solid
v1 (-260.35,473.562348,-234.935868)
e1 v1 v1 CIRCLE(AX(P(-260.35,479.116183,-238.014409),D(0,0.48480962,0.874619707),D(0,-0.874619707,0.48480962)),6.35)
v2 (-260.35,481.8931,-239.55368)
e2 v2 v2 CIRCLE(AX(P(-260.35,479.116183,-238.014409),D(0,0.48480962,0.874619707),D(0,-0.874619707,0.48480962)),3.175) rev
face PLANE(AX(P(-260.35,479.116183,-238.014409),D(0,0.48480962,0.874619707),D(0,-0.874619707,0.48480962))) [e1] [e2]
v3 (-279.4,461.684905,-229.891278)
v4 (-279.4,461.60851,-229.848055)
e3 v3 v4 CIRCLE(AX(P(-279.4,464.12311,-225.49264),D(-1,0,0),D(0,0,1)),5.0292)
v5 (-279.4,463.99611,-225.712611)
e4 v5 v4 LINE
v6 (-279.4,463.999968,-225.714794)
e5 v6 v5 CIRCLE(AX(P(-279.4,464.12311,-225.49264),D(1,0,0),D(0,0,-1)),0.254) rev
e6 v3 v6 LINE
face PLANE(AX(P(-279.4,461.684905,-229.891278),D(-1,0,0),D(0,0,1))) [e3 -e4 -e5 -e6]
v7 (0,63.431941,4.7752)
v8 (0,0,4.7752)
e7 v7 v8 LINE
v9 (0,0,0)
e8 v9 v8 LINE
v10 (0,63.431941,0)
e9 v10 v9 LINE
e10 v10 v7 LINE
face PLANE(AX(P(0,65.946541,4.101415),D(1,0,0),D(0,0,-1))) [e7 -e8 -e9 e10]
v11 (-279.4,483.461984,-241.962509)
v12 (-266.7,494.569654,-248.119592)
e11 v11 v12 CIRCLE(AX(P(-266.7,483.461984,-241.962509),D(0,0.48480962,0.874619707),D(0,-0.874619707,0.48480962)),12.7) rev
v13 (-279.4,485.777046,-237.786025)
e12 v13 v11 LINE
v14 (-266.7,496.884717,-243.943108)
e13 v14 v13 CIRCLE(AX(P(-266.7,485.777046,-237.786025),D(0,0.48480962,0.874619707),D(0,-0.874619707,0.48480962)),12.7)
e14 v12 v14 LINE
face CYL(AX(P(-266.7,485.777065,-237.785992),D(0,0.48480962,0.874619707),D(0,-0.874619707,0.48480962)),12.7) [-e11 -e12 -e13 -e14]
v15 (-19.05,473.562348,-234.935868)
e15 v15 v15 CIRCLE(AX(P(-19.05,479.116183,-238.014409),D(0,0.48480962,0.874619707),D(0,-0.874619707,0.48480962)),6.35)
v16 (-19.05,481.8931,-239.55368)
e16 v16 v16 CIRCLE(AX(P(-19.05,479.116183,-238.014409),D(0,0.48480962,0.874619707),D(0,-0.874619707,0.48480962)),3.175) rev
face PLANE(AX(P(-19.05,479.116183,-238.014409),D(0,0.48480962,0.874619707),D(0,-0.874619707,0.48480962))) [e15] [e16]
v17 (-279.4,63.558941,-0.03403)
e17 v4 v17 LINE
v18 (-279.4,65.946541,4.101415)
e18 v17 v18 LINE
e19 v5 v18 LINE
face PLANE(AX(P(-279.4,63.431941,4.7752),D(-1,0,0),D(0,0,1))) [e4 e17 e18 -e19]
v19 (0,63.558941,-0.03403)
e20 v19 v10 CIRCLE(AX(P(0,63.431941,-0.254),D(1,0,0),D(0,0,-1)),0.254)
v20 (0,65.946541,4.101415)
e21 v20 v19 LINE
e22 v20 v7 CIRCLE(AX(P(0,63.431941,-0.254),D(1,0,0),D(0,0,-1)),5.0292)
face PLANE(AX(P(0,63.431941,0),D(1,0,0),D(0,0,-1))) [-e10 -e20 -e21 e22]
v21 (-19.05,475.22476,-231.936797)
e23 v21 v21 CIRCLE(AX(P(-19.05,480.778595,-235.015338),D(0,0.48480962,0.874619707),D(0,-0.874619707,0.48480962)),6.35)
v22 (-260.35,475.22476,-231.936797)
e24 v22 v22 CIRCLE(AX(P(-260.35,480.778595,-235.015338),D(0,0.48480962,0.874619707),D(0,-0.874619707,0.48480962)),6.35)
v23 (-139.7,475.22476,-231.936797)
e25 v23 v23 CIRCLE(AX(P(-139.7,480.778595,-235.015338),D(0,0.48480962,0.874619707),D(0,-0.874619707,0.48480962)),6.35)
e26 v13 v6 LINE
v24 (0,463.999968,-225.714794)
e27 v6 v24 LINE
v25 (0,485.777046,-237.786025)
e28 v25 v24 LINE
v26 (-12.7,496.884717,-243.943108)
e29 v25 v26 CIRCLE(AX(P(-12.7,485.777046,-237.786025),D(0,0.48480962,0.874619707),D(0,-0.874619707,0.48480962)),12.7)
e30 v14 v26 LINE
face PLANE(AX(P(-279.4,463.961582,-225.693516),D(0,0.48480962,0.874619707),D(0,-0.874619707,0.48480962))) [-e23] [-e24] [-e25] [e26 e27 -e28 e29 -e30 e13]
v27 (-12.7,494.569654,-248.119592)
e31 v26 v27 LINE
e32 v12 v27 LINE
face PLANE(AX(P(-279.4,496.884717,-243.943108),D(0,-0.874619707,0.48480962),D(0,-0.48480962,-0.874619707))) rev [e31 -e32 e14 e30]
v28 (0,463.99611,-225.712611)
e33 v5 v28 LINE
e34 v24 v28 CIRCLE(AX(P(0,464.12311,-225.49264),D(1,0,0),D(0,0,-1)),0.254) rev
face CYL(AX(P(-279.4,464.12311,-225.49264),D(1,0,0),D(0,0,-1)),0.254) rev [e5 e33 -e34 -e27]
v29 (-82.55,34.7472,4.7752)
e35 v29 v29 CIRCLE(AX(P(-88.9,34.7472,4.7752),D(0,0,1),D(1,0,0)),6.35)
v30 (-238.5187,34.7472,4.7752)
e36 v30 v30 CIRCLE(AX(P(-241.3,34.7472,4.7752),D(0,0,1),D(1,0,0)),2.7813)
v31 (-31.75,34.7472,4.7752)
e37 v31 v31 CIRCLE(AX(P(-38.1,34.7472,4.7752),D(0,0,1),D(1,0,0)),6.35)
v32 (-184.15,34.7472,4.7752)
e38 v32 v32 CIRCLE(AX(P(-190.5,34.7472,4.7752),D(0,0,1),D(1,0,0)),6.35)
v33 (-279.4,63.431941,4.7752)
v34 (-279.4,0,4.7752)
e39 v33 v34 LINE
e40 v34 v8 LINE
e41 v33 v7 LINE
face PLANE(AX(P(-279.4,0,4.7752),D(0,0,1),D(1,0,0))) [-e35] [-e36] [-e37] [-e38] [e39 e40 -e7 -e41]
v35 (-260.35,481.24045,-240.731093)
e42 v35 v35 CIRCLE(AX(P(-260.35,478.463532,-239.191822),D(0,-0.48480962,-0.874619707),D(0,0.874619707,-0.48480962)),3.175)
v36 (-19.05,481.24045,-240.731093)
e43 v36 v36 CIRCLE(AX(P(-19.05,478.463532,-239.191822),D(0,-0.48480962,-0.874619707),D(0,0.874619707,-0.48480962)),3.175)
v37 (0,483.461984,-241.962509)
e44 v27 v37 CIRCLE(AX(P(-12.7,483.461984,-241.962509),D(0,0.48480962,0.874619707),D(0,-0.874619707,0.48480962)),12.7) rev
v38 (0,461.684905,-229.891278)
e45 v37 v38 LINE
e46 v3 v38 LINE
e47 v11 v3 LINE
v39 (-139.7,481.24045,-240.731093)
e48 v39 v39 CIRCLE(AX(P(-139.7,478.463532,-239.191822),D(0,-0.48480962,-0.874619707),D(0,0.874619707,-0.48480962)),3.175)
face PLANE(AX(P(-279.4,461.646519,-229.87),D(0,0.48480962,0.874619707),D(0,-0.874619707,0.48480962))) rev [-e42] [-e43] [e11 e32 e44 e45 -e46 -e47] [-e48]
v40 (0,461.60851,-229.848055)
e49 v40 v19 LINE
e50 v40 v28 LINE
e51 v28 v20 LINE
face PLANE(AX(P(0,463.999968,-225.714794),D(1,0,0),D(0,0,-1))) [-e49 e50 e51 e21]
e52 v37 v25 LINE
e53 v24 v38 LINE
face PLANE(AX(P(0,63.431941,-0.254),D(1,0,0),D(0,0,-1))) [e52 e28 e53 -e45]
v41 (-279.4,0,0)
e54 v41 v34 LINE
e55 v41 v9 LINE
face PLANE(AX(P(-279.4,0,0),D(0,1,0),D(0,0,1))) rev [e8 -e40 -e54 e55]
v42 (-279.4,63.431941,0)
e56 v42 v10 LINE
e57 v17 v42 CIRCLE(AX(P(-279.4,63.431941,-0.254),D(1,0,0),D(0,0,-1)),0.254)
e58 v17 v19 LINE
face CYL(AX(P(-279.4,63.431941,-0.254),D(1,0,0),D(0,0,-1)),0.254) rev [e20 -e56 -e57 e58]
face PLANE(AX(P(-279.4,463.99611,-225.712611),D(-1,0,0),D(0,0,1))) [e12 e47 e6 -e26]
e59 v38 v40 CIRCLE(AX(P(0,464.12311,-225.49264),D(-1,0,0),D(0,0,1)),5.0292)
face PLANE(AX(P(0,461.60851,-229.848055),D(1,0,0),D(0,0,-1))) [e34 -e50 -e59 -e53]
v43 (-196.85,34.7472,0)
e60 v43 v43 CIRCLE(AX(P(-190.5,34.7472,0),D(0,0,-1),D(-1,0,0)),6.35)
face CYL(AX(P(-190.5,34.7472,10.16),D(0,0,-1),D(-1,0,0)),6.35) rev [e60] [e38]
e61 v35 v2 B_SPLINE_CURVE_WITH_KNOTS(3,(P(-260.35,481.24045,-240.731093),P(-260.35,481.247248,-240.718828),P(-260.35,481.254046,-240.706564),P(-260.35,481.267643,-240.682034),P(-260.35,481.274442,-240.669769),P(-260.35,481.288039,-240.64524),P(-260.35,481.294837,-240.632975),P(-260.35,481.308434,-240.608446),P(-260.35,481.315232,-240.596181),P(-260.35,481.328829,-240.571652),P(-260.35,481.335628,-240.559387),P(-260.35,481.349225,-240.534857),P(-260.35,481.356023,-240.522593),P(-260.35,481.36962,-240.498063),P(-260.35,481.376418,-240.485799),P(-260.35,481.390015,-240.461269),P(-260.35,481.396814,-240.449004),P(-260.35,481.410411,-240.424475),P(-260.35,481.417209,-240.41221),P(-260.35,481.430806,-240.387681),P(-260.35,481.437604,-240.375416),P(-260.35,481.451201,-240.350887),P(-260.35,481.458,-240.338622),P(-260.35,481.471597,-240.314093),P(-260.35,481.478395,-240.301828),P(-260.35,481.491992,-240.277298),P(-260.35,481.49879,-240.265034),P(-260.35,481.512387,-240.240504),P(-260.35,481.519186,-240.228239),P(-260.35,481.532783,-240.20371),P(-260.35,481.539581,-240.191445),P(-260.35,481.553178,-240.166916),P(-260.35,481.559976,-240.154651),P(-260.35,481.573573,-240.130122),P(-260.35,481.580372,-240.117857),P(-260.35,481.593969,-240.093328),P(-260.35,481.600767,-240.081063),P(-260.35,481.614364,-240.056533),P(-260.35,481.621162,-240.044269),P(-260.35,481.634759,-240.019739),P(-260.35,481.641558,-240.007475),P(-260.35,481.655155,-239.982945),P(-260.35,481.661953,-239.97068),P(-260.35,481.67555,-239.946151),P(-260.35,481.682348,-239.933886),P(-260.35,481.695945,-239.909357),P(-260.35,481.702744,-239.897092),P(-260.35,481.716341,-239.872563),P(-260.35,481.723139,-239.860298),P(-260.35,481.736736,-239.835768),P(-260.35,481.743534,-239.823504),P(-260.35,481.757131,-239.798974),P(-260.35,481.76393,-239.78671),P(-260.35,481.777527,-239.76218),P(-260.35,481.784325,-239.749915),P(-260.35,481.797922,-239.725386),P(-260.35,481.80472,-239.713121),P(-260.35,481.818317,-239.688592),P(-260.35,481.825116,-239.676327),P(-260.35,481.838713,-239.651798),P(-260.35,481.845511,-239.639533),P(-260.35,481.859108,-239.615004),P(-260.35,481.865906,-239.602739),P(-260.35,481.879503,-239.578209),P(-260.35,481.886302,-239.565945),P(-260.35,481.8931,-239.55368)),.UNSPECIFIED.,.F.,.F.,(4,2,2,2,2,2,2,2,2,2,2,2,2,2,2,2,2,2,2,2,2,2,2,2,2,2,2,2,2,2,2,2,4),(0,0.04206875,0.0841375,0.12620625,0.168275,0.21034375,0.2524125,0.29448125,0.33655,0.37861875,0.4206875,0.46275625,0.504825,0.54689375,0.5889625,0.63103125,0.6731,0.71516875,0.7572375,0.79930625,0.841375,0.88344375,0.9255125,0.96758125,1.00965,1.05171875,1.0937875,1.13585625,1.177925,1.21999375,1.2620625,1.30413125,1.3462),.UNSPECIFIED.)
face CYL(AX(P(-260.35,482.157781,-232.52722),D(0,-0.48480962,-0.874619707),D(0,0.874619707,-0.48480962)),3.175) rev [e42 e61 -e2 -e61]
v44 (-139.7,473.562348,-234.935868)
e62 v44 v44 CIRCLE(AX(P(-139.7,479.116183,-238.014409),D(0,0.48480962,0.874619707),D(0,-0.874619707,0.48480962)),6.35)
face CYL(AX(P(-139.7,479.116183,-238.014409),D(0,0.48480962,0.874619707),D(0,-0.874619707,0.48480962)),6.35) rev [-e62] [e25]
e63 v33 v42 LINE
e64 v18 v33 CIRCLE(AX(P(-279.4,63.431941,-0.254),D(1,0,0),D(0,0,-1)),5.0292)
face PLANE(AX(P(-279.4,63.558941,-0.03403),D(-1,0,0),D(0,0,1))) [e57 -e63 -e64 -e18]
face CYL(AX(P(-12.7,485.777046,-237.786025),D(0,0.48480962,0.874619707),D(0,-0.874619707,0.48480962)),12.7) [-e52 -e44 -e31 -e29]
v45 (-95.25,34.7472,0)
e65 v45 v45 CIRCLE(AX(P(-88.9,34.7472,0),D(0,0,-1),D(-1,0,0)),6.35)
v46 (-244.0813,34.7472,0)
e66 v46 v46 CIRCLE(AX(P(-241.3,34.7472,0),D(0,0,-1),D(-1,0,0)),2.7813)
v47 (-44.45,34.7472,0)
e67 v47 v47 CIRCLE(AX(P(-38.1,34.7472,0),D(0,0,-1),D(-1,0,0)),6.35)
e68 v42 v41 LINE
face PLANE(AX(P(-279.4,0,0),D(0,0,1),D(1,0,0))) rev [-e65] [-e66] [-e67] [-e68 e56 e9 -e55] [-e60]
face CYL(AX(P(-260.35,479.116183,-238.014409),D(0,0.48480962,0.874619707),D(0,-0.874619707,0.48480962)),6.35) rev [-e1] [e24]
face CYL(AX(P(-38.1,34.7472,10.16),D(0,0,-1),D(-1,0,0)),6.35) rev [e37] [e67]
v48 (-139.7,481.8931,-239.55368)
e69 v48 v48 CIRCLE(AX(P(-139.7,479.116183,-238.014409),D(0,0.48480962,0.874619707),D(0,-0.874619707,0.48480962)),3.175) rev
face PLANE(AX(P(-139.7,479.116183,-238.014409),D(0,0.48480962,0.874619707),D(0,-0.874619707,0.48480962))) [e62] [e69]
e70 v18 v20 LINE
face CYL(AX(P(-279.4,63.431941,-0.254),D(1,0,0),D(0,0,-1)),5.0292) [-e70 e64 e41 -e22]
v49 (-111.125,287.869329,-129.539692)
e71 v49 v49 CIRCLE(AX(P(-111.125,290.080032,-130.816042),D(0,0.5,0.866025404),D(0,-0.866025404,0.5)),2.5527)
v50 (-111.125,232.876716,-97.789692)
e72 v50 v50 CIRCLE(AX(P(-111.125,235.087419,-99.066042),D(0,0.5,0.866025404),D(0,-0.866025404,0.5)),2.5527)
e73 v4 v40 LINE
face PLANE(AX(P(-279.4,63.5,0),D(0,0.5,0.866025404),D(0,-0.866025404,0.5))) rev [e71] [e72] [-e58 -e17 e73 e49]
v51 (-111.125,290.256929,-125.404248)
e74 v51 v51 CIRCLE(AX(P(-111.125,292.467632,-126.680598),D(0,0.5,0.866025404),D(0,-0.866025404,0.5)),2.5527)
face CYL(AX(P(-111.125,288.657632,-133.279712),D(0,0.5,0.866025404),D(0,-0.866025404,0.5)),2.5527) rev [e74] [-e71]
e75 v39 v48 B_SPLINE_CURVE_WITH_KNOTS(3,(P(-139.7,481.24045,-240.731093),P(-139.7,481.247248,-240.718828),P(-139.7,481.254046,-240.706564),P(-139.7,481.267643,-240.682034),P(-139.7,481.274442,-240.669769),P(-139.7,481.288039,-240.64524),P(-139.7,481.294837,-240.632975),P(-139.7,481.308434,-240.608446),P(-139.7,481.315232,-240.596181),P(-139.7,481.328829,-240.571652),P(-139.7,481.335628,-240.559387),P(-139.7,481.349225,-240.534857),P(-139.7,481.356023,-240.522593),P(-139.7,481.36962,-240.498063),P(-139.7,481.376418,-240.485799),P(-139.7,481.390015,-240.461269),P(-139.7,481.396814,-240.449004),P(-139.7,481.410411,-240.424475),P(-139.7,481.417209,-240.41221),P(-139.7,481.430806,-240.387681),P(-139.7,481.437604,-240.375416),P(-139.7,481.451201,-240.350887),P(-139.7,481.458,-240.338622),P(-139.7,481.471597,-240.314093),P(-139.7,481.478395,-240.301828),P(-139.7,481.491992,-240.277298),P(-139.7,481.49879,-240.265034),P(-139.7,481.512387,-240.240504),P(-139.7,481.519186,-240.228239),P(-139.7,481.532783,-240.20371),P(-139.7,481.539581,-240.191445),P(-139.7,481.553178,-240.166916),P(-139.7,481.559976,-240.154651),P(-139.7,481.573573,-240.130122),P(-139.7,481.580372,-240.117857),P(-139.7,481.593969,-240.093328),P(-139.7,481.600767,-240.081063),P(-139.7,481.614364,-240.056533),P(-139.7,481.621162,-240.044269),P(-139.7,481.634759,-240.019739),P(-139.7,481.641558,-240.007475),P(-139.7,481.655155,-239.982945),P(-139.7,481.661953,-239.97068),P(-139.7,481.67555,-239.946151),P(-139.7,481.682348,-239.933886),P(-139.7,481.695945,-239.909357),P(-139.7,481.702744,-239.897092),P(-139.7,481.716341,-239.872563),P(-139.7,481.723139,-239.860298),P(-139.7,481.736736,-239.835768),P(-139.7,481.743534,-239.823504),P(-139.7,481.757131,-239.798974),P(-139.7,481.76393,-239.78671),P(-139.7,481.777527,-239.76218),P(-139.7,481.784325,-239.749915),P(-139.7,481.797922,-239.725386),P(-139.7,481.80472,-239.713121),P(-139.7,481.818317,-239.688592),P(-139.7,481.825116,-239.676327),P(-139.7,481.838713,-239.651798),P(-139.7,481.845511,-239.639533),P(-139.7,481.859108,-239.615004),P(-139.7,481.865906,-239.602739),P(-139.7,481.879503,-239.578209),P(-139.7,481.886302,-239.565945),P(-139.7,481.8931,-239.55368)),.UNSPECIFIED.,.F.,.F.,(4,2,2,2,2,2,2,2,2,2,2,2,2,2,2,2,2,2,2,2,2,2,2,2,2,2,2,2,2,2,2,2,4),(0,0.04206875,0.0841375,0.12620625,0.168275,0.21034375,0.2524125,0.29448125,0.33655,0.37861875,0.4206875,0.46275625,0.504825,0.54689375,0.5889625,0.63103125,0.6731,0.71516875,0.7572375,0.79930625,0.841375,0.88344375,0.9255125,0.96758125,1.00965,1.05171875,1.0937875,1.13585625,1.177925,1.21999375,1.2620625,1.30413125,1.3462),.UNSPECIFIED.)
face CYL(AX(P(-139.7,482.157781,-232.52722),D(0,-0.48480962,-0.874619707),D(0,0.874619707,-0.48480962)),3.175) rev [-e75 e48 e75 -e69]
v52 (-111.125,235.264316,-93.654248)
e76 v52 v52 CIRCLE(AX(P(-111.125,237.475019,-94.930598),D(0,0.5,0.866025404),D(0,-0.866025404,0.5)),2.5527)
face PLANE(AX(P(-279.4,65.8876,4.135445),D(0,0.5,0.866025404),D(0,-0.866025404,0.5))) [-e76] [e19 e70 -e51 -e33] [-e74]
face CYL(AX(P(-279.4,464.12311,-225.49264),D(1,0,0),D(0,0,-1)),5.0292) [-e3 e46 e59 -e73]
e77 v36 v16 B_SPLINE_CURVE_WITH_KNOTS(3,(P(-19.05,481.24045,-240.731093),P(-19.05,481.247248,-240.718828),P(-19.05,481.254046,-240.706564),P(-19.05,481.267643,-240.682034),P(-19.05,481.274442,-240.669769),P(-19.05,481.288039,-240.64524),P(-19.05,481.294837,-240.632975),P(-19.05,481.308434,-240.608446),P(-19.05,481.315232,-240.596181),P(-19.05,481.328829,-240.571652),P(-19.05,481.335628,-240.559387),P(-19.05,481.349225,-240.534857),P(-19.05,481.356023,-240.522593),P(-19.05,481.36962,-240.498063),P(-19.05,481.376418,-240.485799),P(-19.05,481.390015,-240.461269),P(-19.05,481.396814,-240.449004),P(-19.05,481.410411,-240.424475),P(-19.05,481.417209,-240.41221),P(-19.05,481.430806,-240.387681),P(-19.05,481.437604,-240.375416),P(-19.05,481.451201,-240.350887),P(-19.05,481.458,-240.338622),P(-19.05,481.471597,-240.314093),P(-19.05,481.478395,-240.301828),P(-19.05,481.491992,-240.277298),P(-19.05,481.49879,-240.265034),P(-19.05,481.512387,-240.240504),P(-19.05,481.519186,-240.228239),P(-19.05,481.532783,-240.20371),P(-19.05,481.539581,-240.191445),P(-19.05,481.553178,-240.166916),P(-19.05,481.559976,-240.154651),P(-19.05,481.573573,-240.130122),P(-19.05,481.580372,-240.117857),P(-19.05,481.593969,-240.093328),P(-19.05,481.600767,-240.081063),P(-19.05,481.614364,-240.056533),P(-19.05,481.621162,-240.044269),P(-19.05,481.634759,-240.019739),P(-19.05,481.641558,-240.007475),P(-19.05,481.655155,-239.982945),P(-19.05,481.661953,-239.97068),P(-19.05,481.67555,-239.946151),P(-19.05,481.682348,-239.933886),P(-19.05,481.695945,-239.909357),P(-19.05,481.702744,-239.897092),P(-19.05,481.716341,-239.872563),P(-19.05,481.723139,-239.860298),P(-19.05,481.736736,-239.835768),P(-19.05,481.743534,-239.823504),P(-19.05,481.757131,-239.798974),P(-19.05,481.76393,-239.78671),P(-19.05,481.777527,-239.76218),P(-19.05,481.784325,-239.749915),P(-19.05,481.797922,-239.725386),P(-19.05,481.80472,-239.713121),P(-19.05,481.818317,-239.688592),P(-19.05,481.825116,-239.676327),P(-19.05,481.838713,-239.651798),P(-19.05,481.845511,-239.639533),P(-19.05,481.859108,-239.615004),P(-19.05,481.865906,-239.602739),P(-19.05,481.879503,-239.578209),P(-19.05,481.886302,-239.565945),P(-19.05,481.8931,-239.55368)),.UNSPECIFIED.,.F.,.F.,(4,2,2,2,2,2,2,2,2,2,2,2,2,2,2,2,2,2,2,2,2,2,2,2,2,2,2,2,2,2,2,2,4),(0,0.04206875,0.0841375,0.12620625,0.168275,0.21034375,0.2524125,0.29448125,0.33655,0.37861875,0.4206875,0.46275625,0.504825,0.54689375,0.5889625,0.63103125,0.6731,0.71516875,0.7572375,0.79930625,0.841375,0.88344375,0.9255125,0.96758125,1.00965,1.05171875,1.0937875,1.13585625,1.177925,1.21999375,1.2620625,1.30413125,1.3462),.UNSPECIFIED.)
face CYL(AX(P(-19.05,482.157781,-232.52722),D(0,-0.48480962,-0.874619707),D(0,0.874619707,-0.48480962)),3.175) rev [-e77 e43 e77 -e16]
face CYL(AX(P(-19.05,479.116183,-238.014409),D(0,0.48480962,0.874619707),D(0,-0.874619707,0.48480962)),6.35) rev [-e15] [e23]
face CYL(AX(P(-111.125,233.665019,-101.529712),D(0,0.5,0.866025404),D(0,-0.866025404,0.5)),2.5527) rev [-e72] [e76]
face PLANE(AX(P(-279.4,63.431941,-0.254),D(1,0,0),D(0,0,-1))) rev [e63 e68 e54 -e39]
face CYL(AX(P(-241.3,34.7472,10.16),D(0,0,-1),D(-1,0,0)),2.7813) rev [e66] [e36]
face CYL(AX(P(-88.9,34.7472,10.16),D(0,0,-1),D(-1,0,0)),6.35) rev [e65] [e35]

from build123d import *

# Parameters (mm, degrees)
BASE_FLANGE1_DEPTH = 279.4
SKETCH4_R          = 3.175
TAB1_DEPTH         = 4.7752
SKETCH4_2_R        = 3.175
CUT_EXTRUDE1_DEPTH = 7.62
SKETCH5_R          = 6.35
SKETCH5_R_2        = 2.7813
CUT_EXTRUDE2_DEPTH = 10.16
SKETCH6_R          = 6.35
CUT_EXTRUDE3_DEPTH = 3.429
FILLET1_R          = 12.7
FILLET2_R          = 12.7
SKETCH7_R          = 2.5527
CUT_EXTRUDE4_DEPTH = 7.62


# Sheet-metal steps are written as plain solids
with BuildPart() as part:
    # Sketch1 → Base-Flange1 (new body)
    with BuildSketch(Plane(origin=(0, 0, 0), x_dir=(0, 0, -1), z_dir=(1, 0, 0))):
        with BuildLine():
            Line((0, 0), (0, 63.431940905))
            ThreePointArc((0, 63.431940905), (0.00865484, 63.497680943), (0.034029547, 63.558940905))
            Line((0.034029547, 63.558940905), (229.848055418, 461.608510005))
            ThreePointArc((229.848055418, 461.608510005), (229.869833323, 461.646613437), (229.891277889, 461.684905463))
            Line((229.891277889, 461.684905463), (248.119591573, 494.569653848))
            Line((248.119591573, 494.569653848), (243.943107547, 496.884716746))
            Line((243.943107547, 496.884716746), (225.714793821, 463.999968287))
            ThreePointArc((225.714793821, 463.999968287), (225.713710761, 463.998034347), (225.712610867, 463.996109931))
            Line((225.712610867, 463.996109931), (-4.101414961, 65.946540905))
            ThreePointArc((-4.101414961, 65.946540905), (-4.603834166, 64.733593647), (-4.7752, 63.431940905))
            Line((-4.7752, 63.431940905), (-4.7752, 0))
            Line((-4.7752, 0), (0, 0))
        make_face()
    extrude(amount=-BASE_FLANGE1_DEPTH)

    # Sketch4 → Tab1 (add)
    with BuildSketch(Plane(origin=(0, 11.035159758, 19.907955191), x_dir=(-1, 0, 0), z_dir=(0, -0.48480962024634994, -0.8746197071393886))):
        with Locations((19.05, 534.436130775)):
            Circle(SKETCH4_R)
        with Locations((139.7, 534.436130775)):
            Circle(SKETCH4_R)
        with Locations((260.35, 534.436130775)):
            Circle(SKETCH4_R)
    extrude(amount=-TAB1_DEPTH)

    # Sketch4<2> → Cut-Extrude1 (cut)
    with BuildSketch(Plane(origin=(0, 11.035159758, 19.907955191), x_dir=(-1, 0, 0), z_dir=(0, -0.48480962024634994, -0.8746197071393886))):
        with Locations(Location((19.05, 534.436130775, 0), (0, 0, 90))):
            Circle(SKETCH4_2_R)
        with Locations(Location((139.7, 534.436130775, 0), (0, 0, 90))):
            Circle(SKETCH4_2_R)
        with Locations(Location((260.35, 534.436130775, 0), (0, 0, 90))):
            Circle(SKETCH4_2_R)
    extrude(amount=-CUT_EXTRUDE1_DEPTH, mode=Mode.SUBTRACT)

    # Sketch5 → Cut-Extrude2 (cut)
    with BuildSketch(Plane(origin=(0, 0, 0), x_dir=(-1, 0, 0), z_dir=(0, 0, -1))):
        with Locations((38.1, 34.7472)):
            Circle(SKETCH5_R)
        with Locations((88.9, 34.7472)):
            Circle(SKETCH5_R)
        with Locations((190.5, 34.7472)):
            Circle(SKETCH5_R)
        with Locations((241.3, 34.7472)):
            Circle(SKETCH5_R_2)
    extrude(amount=-CUT_EXTRUDE2_DEPTH, mode=Mode.SUBTRACT)

    # Sketch6 → Cut-Extrude3 (cut)
    with BuildSketch(Plane(origin=(0, 13.350222657, 24.084439216), x_dir=(1, 0, 0), z_dir=(0, 0.48480962024634877, 0.8746197071393893))):
        with Locations(Location((-260.35, 534.436130775, 0), (0, 0, 270))):
            Circle(SKETCH6_R)
        with Locations(Location((-139.7, 534.436130775, 0), (0, 0, 270))):
            Circle(SKETCH6_R)
        with Locations(Location((-19.05, 534.436130775, 0), (0, 0, 270))):
            Circle(SKETCH6_R)
    extrude(amount=-CUT_EXTRUDE3_DEPTH, mode=Mode.SUBTRACT)

    # Fillet1
    fillet1_edges = [part.edges().sort_by_distance(p)[0] for p in [
        (-279.4, 495.727185297, -246.03134956),
    ]]
    fillet(fillet1_edges, radius=FILLET1_R)

    # Fillet2
    fillet2_edges = [part.edges().sort_by_distance(p)[0] for p in [
        (0, 495.727185297, -246.03134956),
    ]]
    fillet(fillet2_edges, radius=FILLET2_R)

    # Sketch7 → Cut-Extrude4 (cut)
    with BuildSketch(Plane(origin=(0, 18.2626, 31.631751078), x_dir=(1, 0, 0), z_dir=(0, 0.5000000000000011, 0.8660254037844382))):
        with Locations(Location((-111.125, 316.624698106, 0), (0, 0, 270))):
            Circle(SKETCH7_R)
        with Locations(Location((-111.125, 253.124698106, 0), (0, 0, 270))):
            Circle(SKETCH7_R)
    extrude(amount=-CUT_EXTRUDE4_DEPTH, mode=Mode.SUBTRACT)


solid = part.part
